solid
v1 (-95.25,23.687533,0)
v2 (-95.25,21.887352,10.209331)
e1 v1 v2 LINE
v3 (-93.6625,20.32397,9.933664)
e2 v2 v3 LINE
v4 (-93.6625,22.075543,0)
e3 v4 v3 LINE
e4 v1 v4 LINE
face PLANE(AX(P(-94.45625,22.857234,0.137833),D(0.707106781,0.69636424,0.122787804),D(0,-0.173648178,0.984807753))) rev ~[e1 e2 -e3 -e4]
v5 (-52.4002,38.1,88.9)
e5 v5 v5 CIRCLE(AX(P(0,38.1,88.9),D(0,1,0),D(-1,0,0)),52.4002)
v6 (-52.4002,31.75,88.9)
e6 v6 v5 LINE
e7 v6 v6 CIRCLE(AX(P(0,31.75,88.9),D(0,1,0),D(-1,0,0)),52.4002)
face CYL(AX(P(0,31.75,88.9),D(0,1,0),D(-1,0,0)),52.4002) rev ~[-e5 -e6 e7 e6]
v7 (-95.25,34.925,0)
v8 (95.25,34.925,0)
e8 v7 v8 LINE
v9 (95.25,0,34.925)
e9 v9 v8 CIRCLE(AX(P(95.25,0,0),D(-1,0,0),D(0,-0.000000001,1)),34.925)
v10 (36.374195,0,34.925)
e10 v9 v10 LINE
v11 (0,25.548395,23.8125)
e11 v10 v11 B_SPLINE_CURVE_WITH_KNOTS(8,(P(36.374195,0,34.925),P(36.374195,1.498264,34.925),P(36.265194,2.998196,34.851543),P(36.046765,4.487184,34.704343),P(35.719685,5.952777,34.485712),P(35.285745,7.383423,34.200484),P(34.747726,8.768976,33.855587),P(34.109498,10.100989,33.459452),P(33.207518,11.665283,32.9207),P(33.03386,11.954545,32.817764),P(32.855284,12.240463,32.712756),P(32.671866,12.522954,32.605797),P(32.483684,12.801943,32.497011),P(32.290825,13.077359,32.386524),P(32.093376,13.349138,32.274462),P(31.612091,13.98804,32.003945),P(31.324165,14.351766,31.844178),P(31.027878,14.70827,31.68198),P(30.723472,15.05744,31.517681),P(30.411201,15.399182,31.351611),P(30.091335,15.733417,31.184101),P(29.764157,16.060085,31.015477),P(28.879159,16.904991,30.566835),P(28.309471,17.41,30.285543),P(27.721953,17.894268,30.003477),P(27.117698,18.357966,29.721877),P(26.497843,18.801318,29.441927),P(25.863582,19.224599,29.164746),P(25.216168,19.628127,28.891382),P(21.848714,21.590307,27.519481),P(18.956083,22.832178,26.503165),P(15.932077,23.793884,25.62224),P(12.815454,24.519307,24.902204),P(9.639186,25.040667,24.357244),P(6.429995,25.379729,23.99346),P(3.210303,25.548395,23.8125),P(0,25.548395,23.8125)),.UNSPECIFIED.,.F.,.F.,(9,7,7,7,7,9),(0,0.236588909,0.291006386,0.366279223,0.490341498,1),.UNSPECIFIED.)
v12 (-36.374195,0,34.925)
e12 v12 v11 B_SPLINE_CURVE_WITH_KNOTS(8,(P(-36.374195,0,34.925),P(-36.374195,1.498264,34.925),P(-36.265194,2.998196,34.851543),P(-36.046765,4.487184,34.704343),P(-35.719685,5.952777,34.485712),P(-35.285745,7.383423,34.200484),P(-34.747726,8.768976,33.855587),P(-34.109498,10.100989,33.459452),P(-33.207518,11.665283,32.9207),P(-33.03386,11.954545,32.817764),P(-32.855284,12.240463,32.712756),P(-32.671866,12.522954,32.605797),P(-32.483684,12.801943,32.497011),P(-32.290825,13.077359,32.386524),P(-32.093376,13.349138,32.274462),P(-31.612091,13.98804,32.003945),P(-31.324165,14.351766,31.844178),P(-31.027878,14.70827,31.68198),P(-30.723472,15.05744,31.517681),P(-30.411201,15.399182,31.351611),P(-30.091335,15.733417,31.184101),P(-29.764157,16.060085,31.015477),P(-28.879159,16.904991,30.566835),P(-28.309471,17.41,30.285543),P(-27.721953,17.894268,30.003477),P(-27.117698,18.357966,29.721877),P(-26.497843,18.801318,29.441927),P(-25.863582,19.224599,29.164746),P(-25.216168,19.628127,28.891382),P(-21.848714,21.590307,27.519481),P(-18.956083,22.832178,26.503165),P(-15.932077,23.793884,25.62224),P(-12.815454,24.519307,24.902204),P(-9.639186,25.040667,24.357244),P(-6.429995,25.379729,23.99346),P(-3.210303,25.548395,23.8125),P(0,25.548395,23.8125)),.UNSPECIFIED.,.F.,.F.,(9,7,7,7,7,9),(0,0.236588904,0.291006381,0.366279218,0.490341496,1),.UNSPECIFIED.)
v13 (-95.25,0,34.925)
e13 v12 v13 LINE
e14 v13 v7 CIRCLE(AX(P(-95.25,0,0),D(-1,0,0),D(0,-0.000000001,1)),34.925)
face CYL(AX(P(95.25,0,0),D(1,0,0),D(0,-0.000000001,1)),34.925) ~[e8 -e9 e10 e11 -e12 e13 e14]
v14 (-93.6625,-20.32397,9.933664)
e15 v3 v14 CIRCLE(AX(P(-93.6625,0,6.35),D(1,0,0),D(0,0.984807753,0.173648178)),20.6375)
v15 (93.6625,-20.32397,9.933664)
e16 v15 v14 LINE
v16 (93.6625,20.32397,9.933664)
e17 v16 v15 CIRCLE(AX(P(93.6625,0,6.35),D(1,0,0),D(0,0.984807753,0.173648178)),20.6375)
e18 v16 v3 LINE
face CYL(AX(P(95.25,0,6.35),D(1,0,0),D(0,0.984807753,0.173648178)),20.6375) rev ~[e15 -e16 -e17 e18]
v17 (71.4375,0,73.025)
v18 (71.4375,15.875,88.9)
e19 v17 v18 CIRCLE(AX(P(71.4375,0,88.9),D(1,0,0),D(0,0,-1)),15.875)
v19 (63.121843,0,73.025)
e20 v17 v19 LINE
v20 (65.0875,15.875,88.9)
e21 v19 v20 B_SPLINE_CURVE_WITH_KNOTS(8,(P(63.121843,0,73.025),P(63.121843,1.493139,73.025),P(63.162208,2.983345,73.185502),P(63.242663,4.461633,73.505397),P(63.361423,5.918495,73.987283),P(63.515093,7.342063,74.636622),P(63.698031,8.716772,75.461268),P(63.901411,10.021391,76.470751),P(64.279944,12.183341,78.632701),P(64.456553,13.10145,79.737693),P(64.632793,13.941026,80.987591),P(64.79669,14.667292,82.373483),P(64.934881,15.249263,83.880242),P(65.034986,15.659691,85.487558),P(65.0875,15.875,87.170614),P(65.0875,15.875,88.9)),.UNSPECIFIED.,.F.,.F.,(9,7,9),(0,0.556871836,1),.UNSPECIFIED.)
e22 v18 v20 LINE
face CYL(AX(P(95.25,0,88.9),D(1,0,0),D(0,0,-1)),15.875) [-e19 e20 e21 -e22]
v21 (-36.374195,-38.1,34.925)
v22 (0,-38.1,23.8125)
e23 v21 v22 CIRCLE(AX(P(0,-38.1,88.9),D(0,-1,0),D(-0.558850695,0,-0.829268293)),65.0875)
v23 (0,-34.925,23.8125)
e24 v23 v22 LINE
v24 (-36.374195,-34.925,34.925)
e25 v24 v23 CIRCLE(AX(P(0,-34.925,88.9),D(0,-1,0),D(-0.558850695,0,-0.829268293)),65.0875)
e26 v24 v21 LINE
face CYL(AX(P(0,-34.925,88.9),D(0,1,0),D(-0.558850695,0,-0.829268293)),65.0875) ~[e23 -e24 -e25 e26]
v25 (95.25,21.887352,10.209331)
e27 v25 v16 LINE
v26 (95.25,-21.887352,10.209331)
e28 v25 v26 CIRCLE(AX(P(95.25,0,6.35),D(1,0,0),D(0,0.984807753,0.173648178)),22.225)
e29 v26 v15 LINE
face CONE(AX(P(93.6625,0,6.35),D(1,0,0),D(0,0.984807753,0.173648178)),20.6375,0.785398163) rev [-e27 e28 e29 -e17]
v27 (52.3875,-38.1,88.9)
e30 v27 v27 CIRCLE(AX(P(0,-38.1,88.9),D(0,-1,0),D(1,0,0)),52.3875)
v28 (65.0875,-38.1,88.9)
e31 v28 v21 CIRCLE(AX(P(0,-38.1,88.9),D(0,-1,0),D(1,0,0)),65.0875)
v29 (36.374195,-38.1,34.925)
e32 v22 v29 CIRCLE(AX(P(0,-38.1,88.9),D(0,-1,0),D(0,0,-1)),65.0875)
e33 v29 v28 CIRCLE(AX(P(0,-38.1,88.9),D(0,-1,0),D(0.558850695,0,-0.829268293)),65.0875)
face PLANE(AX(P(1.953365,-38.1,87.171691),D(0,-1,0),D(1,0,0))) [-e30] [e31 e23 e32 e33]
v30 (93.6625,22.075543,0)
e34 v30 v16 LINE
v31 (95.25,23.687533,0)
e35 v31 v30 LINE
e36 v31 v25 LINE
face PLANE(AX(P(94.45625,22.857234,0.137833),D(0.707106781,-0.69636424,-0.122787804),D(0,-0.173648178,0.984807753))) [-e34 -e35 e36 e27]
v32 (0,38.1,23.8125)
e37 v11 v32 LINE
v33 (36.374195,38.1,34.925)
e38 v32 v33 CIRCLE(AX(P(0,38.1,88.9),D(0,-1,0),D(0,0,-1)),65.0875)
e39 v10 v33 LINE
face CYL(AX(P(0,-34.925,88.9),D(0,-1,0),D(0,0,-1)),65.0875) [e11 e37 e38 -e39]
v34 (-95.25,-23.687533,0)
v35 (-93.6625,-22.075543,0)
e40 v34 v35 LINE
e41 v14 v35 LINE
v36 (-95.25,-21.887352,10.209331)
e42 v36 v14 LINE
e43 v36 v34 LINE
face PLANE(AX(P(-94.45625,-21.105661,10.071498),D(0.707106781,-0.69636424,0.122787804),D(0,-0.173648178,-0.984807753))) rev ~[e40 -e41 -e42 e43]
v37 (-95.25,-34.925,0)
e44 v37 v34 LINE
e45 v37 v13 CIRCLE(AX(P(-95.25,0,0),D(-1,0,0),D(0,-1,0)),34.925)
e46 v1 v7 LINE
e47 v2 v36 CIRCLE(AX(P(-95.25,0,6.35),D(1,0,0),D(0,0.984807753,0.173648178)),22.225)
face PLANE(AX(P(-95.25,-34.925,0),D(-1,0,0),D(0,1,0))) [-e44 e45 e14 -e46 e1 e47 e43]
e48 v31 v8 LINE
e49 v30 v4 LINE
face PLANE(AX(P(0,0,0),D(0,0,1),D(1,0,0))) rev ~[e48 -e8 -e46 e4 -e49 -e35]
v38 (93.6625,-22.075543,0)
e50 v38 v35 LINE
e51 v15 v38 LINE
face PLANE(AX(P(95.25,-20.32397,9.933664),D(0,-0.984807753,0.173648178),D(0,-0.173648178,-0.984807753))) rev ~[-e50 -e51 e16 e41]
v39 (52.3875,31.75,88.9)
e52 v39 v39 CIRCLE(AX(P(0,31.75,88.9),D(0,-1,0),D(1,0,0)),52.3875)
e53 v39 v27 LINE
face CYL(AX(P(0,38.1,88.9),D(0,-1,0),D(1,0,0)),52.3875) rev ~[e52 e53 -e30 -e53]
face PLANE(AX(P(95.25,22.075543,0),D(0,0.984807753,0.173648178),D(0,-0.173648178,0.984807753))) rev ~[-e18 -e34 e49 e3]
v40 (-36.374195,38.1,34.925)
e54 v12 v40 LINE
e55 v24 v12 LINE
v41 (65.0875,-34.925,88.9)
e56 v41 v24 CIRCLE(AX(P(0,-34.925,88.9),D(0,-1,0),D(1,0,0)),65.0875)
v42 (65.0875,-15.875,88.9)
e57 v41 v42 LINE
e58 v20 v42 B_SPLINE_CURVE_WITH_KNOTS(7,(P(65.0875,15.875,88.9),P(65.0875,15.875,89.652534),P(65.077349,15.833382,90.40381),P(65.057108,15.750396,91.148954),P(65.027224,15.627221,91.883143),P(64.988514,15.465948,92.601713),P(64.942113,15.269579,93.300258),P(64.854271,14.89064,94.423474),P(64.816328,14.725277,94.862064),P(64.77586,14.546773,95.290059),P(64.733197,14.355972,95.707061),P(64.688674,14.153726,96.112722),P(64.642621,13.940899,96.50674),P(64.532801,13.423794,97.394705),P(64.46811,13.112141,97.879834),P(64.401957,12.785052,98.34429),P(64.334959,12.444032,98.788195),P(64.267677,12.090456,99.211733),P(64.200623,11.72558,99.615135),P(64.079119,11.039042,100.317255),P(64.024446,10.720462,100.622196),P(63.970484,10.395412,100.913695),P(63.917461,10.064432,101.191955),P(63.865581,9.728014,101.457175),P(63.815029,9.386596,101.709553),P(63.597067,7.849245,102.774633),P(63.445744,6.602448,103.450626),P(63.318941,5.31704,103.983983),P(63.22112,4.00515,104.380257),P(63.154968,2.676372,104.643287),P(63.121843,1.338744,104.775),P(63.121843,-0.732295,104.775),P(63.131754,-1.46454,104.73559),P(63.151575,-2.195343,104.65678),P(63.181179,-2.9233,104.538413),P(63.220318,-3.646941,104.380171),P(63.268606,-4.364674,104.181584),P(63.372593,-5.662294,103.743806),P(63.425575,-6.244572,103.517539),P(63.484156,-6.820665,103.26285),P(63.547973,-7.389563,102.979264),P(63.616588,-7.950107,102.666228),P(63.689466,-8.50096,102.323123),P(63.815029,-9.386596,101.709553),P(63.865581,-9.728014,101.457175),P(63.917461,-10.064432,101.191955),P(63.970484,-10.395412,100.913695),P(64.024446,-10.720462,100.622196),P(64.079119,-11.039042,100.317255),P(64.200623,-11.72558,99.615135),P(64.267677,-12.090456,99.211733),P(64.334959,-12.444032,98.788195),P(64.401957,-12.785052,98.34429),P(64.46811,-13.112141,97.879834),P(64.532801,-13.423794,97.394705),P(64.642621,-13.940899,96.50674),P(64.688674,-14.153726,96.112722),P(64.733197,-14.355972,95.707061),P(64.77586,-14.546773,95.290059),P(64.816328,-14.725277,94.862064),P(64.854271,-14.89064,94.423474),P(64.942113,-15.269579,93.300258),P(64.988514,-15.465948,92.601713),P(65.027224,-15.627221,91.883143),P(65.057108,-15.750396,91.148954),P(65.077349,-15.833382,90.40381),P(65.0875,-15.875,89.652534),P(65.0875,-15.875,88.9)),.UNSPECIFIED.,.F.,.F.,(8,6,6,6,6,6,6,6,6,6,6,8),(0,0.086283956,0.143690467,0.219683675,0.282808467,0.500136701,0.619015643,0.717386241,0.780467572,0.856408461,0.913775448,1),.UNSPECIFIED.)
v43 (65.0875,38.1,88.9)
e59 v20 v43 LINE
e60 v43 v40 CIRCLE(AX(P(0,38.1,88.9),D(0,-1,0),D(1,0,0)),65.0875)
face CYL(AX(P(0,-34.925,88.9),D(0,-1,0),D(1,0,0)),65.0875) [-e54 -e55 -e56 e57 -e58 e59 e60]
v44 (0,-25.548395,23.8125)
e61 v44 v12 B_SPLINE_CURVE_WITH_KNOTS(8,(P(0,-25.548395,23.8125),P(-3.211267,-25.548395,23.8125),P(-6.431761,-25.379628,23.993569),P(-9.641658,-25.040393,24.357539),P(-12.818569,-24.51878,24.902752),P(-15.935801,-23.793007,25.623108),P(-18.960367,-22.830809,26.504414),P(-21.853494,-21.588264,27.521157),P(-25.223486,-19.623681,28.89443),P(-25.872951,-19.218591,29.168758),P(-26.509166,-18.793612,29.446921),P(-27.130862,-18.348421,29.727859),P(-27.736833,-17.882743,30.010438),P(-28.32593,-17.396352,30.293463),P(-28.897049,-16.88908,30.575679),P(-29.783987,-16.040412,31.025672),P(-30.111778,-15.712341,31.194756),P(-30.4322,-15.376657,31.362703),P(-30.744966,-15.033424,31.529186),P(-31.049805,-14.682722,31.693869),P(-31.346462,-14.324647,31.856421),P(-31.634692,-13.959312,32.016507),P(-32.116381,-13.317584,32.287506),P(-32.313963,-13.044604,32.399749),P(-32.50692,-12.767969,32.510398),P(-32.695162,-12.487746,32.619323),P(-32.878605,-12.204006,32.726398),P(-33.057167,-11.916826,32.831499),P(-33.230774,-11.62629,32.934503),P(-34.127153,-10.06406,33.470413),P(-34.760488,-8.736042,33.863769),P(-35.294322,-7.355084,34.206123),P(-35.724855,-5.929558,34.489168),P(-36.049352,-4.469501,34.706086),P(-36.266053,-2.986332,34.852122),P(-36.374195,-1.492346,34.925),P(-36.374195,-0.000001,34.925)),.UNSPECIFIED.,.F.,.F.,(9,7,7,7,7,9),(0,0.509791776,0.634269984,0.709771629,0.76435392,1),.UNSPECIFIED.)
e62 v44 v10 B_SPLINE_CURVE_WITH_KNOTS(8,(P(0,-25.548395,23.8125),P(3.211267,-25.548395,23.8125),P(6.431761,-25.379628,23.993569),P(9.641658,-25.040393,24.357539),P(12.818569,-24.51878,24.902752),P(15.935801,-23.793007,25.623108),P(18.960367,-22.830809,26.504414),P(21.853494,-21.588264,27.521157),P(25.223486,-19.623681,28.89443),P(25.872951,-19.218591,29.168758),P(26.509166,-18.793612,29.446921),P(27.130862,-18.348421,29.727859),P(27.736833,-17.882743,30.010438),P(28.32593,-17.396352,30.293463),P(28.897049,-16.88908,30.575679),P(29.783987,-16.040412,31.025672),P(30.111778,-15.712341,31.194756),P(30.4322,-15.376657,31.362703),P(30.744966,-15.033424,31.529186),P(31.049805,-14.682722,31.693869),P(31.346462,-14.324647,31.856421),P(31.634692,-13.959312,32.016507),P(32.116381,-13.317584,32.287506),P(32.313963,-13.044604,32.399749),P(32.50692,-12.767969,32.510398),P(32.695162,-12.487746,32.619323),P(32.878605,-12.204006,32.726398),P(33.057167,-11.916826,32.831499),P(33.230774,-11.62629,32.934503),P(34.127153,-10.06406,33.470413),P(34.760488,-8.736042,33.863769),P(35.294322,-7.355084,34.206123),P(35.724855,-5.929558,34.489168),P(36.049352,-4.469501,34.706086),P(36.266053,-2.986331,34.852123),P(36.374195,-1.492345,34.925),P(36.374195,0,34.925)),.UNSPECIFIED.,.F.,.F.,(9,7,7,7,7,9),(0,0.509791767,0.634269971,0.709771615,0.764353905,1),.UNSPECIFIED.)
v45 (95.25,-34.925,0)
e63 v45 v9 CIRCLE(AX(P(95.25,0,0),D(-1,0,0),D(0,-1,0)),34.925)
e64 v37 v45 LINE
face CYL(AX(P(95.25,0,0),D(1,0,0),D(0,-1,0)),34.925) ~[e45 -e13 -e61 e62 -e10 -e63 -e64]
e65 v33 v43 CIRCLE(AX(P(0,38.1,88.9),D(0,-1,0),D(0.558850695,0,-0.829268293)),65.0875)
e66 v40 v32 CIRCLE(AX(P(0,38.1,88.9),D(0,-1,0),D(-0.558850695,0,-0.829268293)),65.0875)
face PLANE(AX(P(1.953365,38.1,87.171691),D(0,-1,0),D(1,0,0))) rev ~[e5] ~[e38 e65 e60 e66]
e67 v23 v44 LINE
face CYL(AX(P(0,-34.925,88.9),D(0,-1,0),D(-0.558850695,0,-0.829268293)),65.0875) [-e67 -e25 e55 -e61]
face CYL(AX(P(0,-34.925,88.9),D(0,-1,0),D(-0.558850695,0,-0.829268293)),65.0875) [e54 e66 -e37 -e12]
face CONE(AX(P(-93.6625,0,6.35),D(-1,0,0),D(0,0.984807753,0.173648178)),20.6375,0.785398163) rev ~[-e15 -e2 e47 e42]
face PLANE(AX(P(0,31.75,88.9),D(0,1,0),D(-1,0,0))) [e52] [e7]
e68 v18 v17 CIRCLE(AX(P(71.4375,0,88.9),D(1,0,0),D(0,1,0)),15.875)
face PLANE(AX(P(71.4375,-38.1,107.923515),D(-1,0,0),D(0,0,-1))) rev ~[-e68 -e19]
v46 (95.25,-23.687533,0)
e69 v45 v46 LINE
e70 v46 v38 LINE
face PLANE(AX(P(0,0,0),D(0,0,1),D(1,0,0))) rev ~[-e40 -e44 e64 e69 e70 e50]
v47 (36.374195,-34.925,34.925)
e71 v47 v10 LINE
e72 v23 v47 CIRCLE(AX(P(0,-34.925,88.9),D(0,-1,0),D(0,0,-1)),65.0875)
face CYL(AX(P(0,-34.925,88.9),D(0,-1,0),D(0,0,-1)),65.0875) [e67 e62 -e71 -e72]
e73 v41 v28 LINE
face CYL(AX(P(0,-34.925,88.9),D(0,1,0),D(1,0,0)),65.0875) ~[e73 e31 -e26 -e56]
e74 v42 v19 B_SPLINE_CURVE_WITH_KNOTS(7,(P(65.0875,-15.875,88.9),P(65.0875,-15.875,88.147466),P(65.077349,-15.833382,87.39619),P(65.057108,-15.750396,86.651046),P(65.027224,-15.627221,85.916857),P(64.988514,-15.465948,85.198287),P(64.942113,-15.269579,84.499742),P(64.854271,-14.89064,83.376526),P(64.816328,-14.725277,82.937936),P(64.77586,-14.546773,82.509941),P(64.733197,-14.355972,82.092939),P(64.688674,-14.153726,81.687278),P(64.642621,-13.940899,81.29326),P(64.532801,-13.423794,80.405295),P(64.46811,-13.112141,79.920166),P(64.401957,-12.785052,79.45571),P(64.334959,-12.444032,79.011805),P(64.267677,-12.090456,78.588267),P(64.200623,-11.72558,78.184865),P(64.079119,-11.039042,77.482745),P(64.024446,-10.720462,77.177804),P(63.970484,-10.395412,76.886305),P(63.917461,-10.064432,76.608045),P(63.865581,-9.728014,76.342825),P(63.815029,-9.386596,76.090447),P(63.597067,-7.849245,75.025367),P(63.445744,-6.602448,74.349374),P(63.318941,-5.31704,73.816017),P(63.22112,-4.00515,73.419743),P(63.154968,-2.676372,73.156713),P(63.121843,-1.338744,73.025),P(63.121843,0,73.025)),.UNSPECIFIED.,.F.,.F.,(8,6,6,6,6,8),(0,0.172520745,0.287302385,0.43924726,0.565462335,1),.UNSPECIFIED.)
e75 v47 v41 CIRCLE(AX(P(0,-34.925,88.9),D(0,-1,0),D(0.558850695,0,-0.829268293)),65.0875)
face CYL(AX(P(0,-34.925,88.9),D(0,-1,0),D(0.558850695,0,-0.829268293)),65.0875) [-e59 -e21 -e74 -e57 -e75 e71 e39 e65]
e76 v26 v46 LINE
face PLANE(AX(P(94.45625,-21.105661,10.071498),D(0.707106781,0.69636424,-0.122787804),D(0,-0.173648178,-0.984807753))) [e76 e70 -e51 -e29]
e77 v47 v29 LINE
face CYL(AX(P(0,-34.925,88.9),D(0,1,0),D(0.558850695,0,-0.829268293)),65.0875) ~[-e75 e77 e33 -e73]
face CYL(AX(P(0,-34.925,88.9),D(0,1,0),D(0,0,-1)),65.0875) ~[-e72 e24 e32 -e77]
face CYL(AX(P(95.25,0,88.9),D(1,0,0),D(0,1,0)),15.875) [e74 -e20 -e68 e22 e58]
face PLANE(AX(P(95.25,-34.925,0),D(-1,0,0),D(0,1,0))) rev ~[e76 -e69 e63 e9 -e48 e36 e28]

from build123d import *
from build123d import SkipClean  # not in build123d's __all__

# Parameters (mm, degrees)
F0_W            = 190.5
F0_H            = 69.85
F1_DEPTH        = 34.925
F4_DEPTH        = 190.5
F5_DEPTH        = 73.025
F6_DEPTH        = 3.175
F9_DEPTH        = 190.5010001
F10_SIZE2       = 1.5875
F10_SIZE        = 1.5875
F14_DEPTH       = 36.64824
F16_DEPTH       = 83.54939
F17_D           = 104.775
F17_CBORE_D     = 104.8004
F17_CBORE_DEPTH = 6.35


with BuildPart() as f1:
    # F0 (on Top) → F1 (new body)
    with BuildSketch(Plane.XY):
        Rectangle(F0_W, F0_H)
    extrude(amount=F1_DEPTH)

    # F2 (on face) → F4 (cut)
    with BuildSketch(Plane.YZ.offset(95.25)):
        with BuildLine():
            Line((-34.925, 34.925), (-34.925, 0))
            ThreePointArc((-34.925, 0), (-24.6957043451, 24.6957043208), (-3.45e-08, 34.925))
            Line((-3.45e-08, 34.925), (-34.925, 34.925))
        make_face()
        with BuildLine():
            ThreePointArc((-3.45e-08, 34.925), (24.6957043208, 24.6957043451), (34.925, 0))
            Line((34.925, 0), (34.925, 34.925))
            Line((34.925, 34.925), (-3.45e-08, 34.925))
        make_face()
    extrude(amount=-F4_DEPTH, mode=Mode.SUBTRACT)

    # F3 (on face) → F5 (join)
    with BuildSketch(Plane.XZ.offset(34.925)):
        with BuildLine():
            Line((-36.3741945787, 34.925), (0, 34.925))
            Line((0, 34.925), (36.3741945787, 34.925))
            ThreePointArc((36.3741945787, 34.925), (57.462544522, 58.3314110024), (65.0875, 88.9))
            ThreePointArc((65.0875, 88.9), (-30.5685889976, 146.362544522), (-36.3741945787, 34.925))
        make_face()
        with BuildLine():
            Line((0, 34.925), (0, 23.8125))
            ThreePointArc((0, 23.8125), (19.0168983243, 26.6525885327), (36.3741945787, 34.925))
            Line((36.3741945787, 34.925), (0, 34.925))
        make_face()
        with BuildLine():
            ThreePointArc((-36.3741945787, 34.925), (-19.0168983243, 26.6525885327), (0, 23.8125))
            Line((0, 23.8125), (0, 34.925))
            Line((0, 34.925), (-36.3741945787, 34.925))
        make_face()
    with SkipClean():  # cleaning this boolean's faces spoils the solid; the shape is the same uncleaned
        extrude(amount=-F5_DEPTH)

    # F6 (add): a face of the model
    f6_faces = [f1.faces().sort_by_distance(p)[0] for p in [
        (0, -34.925, 88.9),
    ]]
    with SkipClean():  # cleaning this boolean's faces spoils the solid; the shape is the same uncleaned
        extrude(f6_faces, amount=F6_DEPTH)

    # F8 (on face) → F9 (cut, through all)
    with BuildSketch(Plane.YZ.offset(95.25)):
        with BuildLine():
            Line((22.0755430303, 0), (20.3239700028, 9.9336642666))
            ThreePointArc((20.3239700028, 9.9336642666), (0, 26.9875), (-20.3239700028, 9.9336642666))
            Line((-20.3239700028, 9.9336642666), (-22.0755430303, 0))
            Line((-22.0755430303, 0), (0, 0))
            Line((0, 0), (22.0755430303, 0))
        make_face()
    with SkipClean():  # cleaning this boolean's faces spoils the solid; the shape is the same uncleaned
        extrude(amount=-F9_DEPTH, mode=Mode.SUBTRACT)

    # F10
    f10_edges = [f1.edges().sort_by_distance(p)[0] for p in [
        (95.25, 0, 26.9875),
        (95.25, 21.199757, 4.966832),
        (95.25, -21.199757, 4.966832),
        (-95.25, 0, 26.9875),
        (-95.25, -21.199757, 4.966832),
        (-95.25, 21.199757, 4.966832),
    ]]
    chamfer(f10_edges, length=F10_SIZE, length2=F10_SIZE2)

    # F13 (on face) → F14 (join)
    with BuildSketch(Plane.YZ.offset(95.25)):
        with BuildLine():
            ThreePointArc((15.875, 88.9), (-11.2253201513, 100.1253201513), (0, 73.025))
            ThreePointArc((0, 73.025), (11.2253201513, 77.6746798487), (15.875, 88.9))
        make_face()
    with SkipClean():  # cleaning this boolean's faces spoils the solid; the shape is the same uncleaned
        extrude(amount=-F14_DEPTH)

    # F15 (on face) → F16 (cut)
    with BuildSketch(Plane.XZ.offset(38.1)):
        Polygon((71.4375, 107.923515141), (71.4375, 88.9), (71.4375, 69.2154169083), (71.4375, 68.7513798475), (104.9063950777, 68.7513798475), (104.9063950777, 107.923515141), align=None)
    with SkipClean():  # cleaning this boolean's faces spoils the solid; the shape is the same uncleaned
        extrude(amount=-F16_DEPTH, mode=Mode.SUBTRACT)

    # F17 (through all)
    with Locations(Plane(origin=(0, 38.1, 0), x_dir=(-1, 0, 0), z_dir=(0, 1, 0))):
        with Locations((0, 88.9)):
            CounterBoreHole(F17_D / 2, F17_CBORE_D / 2, F17_CBORE_DEPTH)


solid = f1.part
